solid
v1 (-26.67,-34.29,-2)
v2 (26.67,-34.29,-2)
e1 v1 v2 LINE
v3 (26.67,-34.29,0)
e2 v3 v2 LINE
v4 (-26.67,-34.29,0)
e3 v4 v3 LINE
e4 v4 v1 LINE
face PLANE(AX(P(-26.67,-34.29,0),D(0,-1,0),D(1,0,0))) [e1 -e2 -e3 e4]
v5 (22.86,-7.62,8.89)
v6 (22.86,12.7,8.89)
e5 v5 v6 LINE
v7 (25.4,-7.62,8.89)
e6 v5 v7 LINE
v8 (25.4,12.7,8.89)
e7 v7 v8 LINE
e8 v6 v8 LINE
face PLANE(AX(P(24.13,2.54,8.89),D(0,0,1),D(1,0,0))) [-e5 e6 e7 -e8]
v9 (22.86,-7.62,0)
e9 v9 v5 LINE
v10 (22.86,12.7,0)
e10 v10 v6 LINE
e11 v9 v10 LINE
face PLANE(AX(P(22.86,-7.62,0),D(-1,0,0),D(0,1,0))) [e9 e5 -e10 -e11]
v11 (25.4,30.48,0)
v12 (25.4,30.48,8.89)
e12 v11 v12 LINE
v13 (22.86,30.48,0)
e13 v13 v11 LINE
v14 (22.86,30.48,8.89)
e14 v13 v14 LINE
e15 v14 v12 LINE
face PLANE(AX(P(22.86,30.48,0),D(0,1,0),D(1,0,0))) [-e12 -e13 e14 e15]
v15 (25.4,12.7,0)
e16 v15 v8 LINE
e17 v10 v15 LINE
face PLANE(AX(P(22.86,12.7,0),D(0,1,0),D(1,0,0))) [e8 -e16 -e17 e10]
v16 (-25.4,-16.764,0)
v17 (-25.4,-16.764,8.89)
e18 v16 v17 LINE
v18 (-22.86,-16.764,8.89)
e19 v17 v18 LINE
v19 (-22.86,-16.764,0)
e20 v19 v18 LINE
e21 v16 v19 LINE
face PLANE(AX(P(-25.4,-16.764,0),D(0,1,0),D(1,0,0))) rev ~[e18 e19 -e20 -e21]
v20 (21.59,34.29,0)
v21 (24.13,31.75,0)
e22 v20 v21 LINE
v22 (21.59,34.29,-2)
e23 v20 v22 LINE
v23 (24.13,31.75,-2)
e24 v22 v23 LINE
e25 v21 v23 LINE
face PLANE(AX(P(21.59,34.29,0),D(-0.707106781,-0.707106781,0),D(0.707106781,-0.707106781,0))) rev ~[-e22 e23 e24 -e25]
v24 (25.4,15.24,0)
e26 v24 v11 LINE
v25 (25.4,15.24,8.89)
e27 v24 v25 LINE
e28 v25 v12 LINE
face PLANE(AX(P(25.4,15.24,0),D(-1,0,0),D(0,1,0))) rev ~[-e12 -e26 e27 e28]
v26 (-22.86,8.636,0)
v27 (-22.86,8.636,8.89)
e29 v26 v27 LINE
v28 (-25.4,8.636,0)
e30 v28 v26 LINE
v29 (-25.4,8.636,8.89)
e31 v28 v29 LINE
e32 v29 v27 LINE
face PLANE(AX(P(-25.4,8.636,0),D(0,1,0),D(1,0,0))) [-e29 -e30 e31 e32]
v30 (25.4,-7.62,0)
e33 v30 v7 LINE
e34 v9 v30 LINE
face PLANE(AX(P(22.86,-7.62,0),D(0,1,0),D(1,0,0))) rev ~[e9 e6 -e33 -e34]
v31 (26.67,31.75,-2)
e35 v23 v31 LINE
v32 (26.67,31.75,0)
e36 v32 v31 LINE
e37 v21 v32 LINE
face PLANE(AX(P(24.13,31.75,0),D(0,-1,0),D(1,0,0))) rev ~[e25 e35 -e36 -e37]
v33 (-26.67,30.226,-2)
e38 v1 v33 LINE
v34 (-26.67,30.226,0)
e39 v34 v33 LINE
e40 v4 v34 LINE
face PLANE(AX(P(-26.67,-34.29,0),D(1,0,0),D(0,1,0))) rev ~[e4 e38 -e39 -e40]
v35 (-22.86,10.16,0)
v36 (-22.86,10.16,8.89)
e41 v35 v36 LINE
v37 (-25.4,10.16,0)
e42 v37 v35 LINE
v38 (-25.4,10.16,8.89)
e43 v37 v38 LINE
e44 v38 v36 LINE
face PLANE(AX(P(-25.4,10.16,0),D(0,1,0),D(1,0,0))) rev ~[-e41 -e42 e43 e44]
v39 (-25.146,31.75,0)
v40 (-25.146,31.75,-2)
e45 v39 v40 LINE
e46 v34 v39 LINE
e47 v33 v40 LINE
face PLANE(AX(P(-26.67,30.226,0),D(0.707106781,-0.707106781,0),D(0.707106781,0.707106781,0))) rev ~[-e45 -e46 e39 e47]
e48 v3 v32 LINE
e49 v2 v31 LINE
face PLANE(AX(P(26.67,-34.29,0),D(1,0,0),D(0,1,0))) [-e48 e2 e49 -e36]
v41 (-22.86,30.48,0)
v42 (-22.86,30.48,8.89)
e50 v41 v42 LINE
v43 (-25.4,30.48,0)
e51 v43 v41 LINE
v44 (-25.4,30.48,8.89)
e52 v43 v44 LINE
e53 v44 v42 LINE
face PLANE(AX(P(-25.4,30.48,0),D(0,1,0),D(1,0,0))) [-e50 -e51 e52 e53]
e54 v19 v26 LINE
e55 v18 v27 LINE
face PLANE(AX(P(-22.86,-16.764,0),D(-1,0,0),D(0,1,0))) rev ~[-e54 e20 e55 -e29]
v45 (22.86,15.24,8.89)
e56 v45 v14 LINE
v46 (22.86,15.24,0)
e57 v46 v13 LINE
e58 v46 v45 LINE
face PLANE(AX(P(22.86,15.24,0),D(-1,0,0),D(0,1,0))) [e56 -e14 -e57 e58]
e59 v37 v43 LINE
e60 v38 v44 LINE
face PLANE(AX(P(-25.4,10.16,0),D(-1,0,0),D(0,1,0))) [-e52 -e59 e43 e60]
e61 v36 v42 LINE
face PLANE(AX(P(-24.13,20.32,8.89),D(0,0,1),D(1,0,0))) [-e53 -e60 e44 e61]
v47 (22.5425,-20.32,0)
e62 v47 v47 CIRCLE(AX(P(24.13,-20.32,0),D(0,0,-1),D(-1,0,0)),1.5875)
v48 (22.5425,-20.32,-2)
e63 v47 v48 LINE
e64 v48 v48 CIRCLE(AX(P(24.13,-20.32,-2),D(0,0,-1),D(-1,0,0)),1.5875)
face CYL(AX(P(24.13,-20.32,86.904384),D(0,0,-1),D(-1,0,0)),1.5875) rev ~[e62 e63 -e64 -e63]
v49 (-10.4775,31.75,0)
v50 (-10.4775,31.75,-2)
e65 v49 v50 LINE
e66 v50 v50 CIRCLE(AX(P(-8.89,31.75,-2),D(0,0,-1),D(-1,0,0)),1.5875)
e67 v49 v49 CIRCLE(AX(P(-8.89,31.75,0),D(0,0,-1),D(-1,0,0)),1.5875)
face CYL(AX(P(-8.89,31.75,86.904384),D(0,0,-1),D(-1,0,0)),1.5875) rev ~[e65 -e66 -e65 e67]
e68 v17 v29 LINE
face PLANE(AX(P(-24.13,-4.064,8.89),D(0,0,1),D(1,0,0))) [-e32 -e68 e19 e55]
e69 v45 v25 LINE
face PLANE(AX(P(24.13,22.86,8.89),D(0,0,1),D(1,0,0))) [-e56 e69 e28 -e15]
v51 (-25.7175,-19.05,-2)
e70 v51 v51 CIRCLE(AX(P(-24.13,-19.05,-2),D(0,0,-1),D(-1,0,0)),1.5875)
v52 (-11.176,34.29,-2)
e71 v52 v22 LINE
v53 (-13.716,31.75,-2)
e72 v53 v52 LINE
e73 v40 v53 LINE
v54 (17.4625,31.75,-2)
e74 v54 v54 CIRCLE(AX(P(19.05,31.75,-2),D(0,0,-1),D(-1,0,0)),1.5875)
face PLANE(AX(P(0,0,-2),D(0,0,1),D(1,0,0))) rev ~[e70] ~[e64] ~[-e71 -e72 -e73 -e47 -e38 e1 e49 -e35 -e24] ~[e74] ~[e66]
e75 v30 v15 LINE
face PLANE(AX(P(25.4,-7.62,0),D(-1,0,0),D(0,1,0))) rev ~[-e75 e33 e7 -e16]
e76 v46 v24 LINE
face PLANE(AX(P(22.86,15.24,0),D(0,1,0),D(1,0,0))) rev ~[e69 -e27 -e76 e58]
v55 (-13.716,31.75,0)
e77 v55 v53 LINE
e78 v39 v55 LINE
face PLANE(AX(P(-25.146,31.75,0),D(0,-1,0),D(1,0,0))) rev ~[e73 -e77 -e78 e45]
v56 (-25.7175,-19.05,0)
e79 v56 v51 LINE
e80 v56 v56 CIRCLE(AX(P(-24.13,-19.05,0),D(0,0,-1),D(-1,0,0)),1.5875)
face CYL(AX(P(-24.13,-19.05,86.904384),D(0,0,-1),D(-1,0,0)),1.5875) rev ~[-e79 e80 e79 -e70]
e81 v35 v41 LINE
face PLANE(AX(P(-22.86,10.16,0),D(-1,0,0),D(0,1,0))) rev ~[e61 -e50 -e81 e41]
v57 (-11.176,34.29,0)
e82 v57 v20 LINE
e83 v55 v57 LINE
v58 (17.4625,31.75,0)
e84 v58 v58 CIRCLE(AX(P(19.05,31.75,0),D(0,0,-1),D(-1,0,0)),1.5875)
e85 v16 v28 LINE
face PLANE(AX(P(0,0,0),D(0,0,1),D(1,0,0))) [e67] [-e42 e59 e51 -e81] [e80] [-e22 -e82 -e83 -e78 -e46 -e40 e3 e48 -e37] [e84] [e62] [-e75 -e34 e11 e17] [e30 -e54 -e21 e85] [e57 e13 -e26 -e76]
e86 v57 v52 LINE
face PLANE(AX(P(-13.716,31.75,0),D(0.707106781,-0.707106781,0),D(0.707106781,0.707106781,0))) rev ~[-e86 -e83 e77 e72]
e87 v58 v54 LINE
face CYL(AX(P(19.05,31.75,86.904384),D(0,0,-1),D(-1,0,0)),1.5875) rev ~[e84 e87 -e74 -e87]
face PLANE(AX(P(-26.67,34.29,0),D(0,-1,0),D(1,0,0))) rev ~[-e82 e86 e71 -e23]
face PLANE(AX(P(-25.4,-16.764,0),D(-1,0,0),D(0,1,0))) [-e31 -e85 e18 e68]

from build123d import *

# Parameters (mm, degrees)
F0_W     = 53.34
F0_H     = 68.58
F1_DEPTH = 2
F3_DEPTH = 2
F6_D     = 3.175
F7_W     = 2.54
F7_H     = 20.32
F7_H_2   = 25.4
F7_H_3   = 15.24
F8_DEPTH = 8.89


# Not quite as in the source:
# - a feature names something its author has since deleted; it is built from what else it names


with BuildPart() as f1:
    # F0 (on Top) → F1 (new body)
    with BuildSketch(Plane.XY):
        Rectangle(F0_W, F0_H)
    extrude(amount=-F1_DEPTH)

    # F2 (on face) → F3 (cut, through all)
    with BuildSketch(Plane.XY):
        Polygon((-25.146, 31.75), (-13.716, 31.75), (-11.176, 34.29), (-26.67, 34.29), (-26.67, 30.226), align=None)
        Polygon((26.67, 34.29), (21.59, 34.29), (24.13, 31.75), (26.67, 31.75), align=None)
    extrude(amount=-F3_DEPTH, mode=Mode.SUBTRACT)

    # F6 (through all)
    with Locations(Plane.XY):
        with Locations((-24.13, -19.05), (24.13, -20.32), (19.05, 31.75), (-8.89, 31.75)):
            Hole(F6_D / 2)

    # F7 (on face) → F8 (join)
    with BuildSketch(Plane.XY):
        with Locations((-24.13, 20.32)):
            Rectangle(F7_W, F7_H)
        with Locations((-24.13, -4.064)):
            Rectangle(F7_W, F7_H_2)
        with Locations((24.13, 22.86)):
            Rectangle(F7_W, F7_H_3)
        with Locations((24.13, 2.54)):
            Rectangle(F7_W, F7_H)
    extrude(amount=F8_DEPTH)


solid = f1.part
